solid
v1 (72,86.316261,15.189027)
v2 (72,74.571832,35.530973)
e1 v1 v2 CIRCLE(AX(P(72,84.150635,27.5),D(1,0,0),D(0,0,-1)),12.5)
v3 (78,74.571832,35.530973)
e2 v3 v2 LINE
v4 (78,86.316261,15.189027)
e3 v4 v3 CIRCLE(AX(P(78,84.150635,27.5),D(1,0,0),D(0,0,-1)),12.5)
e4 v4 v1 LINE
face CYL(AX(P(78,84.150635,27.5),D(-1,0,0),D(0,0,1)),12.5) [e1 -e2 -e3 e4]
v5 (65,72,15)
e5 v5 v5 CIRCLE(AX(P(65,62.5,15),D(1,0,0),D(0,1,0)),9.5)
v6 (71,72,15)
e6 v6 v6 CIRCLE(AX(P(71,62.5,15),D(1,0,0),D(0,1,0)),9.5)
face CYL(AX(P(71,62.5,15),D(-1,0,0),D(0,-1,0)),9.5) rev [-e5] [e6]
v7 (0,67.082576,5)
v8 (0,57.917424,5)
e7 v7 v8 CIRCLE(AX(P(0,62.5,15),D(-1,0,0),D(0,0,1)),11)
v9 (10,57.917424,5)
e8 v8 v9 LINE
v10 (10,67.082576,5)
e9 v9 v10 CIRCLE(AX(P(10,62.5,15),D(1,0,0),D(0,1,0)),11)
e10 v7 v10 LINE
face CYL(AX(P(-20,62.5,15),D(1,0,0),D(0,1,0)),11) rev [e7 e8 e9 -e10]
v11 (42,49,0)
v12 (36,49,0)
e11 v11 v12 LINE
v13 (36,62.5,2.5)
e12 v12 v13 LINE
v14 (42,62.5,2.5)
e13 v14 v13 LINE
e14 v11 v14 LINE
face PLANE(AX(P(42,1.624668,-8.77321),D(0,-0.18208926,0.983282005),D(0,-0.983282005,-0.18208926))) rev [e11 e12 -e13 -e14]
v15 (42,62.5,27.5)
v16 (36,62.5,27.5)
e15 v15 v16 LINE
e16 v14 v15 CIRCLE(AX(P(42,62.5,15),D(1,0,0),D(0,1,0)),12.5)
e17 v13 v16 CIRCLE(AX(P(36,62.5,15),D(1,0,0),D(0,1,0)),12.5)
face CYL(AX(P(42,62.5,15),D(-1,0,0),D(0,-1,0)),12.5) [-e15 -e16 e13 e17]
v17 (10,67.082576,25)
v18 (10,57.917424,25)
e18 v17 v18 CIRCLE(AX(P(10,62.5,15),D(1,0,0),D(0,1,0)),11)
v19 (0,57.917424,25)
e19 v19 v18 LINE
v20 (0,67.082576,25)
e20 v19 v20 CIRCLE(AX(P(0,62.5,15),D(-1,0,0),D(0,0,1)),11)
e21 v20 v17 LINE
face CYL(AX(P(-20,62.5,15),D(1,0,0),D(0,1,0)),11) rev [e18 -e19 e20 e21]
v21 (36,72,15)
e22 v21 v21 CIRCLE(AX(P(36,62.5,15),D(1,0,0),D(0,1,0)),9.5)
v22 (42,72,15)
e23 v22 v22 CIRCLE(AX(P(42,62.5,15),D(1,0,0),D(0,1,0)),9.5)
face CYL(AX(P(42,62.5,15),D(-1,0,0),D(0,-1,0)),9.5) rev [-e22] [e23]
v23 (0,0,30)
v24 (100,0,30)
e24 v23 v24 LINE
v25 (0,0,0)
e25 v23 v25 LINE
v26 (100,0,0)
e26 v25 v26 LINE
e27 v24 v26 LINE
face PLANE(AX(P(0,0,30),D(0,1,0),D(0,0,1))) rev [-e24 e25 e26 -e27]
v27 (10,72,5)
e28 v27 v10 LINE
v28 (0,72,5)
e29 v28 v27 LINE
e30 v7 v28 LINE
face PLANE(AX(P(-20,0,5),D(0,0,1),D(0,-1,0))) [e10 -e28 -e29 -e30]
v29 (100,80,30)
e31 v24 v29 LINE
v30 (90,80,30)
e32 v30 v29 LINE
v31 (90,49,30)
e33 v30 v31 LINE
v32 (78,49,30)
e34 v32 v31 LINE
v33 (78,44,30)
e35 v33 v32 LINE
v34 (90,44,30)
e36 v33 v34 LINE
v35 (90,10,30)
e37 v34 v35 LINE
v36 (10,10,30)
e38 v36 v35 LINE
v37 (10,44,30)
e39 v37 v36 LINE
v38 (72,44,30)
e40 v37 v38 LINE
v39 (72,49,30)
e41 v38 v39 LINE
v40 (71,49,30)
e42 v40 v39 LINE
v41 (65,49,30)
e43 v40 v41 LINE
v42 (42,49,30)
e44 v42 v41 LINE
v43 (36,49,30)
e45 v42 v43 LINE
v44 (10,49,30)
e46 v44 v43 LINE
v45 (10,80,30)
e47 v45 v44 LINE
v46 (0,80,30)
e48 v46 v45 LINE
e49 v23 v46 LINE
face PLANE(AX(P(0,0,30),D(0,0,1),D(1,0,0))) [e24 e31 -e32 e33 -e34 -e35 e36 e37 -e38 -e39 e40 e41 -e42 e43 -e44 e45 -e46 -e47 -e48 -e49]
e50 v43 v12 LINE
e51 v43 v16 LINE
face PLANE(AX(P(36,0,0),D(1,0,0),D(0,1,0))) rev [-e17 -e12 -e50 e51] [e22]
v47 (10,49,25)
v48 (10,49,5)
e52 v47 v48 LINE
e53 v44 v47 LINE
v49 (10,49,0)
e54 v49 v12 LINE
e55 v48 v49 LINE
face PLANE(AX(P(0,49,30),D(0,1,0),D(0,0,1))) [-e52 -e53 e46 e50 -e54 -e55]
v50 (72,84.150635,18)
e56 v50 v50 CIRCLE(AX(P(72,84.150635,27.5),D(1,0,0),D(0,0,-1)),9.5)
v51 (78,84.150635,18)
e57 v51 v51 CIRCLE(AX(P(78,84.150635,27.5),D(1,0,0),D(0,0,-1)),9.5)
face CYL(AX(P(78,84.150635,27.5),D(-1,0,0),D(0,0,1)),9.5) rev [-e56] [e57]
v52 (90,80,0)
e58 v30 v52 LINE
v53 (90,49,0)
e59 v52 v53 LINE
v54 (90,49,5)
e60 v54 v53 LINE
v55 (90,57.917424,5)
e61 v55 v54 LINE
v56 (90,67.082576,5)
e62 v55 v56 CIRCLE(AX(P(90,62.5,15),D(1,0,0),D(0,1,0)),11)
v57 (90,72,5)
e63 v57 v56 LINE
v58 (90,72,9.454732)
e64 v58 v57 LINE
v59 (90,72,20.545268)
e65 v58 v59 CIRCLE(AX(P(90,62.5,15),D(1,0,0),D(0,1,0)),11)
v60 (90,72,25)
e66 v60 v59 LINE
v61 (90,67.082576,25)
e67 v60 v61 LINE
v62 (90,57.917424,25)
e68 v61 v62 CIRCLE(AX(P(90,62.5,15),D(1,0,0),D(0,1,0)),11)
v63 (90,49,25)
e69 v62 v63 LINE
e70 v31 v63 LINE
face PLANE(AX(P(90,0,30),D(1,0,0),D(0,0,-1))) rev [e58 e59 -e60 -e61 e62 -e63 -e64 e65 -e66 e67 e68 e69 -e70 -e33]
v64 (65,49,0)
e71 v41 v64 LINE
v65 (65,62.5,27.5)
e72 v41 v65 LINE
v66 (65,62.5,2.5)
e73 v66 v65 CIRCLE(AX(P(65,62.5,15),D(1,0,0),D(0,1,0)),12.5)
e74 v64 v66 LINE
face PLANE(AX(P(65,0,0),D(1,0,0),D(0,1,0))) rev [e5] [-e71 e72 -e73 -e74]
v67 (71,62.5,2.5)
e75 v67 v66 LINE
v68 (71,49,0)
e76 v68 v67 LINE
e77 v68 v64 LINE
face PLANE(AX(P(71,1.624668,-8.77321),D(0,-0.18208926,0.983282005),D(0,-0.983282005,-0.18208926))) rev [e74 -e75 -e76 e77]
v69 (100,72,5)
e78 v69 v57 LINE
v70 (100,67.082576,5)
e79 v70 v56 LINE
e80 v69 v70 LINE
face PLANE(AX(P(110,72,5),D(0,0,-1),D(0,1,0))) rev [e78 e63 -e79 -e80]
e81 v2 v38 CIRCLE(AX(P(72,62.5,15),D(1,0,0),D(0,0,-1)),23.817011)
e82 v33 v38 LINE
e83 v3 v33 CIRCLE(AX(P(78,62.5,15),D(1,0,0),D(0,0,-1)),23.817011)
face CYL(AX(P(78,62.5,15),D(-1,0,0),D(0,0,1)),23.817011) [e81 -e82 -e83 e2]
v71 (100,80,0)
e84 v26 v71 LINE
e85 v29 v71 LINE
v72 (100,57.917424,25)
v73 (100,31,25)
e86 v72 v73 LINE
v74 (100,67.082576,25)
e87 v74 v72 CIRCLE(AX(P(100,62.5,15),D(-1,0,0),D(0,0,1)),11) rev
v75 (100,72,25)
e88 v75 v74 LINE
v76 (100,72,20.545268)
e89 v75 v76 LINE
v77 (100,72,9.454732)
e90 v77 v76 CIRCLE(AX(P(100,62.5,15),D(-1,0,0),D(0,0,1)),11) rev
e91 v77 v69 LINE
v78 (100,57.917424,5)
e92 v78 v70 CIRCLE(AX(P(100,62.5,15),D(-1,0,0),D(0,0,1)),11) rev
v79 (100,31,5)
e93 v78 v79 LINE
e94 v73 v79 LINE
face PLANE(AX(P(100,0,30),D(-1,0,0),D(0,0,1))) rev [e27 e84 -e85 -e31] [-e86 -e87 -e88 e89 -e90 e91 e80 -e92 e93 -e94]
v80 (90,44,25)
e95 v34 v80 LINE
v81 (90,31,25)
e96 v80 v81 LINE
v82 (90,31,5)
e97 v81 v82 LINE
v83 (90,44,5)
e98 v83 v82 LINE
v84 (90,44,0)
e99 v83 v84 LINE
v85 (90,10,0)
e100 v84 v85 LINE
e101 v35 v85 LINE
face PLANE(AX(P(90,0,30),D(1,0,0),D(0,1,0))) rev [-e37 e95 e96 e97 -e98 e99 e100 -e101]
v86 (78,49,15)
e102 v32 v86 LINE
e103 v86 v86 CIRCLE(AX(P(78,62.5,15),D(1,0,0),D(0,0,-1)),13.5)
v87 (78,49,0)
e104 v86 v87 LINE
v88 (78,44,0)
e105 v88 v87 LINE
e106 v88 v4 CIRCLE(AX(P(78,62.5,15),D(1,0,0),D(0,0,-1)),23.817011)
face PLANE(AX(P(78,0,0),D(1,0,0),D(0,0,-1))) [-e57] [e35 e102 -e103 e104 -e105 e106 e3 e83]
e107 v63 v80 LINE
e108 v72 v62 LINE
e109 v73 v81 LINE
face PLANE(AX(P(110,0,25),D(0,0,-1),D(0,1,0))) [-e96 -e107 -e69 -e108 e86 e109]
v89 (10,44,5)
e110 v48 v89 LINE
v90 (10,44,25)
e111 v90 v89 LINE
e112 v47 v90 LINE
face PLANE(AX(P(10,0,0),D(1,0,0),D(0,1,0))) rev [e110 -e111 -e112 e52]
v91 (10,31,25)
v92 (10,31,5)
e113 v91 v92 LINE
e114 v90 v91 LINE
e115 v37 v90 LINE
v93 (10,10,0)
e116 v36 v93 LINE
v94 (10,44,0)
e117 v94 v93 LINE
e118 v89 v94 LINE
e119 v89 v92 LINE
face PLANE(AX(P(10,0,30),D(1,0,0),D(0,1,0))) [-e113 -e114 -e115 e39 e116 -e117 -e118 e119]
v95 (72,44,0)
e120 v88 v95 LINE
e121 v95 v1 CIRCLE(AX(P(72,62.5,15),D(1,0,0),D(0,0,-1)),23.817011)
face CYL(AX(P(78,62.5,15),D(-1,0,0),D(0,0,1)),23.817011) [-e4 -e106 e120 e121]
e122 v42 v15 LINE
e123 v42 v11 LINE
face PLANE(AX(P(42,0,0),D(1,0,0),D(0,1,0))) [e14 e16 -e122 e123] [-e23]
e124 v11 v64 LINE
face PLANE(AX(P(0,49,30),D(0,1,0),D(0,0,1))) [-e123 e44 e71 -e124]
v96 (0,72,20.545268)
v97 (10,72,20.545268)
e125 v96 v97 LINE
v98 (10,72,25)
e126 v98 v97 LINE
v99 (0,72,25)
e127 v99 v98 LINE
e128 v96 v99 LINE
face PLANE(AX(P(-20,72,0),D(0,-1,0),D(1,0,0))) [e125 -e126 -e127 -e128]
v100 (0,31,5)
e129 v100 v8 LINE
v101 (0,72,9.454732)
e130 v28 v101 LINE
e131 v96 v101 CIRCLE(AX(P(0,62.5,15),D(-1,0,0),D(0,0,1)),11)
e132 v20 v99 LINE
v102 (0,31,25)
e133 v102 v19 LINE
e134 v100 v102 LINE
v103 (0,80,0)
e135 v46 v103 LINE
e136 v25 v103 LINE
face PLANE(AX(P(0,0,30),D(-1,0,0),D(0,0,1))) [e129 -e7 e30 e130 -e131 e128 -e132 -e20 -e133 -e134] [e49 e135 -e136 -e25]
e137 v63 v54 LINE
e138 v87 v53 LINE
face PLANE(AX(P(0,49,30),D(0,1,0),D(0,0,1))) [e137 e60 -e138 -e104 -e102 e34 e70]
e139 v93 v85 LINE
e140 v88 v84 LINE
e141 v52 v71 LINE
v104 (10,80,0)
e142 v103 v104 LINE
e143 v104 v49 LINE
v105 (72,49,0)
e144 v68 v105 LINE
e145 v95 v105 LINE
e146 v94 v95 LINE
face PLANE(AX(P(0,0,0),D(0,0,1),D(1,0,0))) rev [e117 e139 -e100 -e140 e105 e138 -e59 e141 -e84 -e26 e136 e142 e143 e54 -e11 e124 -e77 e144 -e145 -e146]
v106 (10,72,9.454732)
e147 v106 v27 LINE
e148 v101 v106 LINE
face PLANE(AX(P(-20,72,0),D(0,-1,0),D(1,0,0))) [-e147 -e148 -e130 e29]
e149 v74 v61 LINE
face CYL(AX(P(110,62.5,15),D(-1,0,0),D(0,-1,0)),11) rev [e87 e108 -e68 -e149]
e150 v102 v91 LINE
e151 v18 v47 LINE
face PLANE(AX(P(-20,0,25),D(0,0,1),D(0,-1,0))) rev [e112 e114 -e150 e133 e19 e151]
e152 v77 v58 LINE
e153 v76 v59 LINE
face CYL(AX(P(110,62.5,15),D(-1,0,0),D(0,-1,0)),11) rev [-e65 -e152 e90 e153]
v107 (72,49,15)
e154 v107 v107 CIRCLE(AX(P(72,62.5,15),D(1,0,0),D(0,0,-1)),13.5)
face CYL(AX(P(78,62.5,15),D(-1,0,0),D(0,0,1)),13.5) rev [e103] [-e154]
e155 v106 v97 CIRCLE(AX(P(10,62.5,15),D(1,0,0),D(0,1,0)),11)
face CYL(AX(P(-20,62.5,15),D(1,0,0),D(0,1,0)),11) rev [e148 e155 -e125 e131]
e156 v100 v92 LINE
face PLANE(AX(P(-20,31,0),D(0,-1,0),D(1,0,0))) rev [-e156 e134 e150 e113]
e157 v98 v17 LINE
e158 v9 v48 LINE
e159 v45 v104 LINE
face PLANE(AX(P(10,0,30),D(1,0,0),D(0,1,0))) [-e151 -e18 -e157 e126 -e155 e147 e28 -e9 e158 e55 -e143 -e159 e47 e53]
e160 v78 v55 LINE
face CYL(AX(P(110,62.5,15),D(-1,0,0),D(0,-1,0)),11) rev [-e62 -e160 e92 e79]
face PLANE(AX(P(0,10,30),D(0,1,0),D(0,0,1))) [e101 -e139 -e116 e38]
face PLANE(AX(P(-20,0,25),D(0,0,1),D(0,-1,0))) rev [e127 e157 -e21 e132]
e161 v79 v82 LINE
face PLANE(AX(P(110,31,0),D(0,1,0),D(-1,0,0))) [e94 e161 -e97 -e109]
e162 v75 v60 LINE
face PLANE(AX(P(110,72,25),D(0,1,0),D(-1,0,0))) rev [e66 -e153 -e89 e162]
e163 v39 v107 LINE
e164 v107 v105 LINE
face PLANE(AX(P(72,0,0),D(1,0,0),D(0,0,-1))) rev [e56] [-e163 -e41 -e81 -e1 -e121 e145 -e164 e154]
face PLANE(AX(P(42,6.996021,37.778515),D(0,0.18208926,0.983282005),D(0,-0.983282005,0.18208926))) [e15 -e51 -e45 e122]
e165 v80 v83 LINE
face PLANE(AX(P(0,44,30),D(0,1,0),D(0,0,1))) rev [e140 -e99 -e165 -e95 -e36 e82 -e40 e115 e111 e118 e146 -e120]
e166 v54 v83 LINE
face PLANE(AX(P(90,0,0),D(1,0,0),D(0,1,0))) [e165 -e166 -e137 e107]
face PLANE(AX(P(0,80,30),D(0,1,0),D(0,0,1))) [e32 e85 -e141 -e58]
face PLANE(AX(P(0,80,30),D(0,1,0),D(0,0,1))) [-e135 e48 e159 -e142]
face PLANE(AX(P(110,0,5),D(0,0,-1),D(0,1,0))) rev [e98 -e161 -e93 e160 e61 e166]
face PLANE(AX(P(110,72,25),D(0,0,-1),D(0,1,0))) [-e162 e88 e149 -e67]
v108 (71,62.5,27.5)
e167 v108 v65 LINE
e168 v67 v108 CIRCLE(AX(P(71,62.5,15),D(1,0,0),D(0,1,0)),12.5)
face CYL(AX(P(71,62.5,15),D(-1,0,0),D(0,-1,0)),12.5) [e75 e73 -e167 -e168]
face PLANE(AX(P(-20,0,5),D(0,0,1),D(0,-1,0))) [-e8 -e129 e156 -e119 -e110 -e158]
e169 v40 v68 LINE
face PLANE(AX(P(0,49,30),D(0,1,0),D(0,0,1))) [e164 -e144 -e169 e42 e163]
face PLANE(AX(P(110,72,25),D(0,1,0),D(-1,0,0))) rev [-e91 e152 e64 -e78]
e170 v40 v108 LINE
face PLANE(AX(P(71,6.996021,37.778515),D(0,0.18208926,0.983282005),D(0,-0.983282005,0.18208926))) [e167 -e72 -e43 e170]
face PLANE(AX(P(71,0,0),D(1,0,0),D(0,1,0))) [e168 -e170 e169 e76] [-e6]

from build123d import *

# Parameters (mm, degrees)
CROQUIS1_W              = 80
CROQUIS1_H              = 34
SALIENTE_EXTRUIR1_DEPTH = 30
CROQUIS2_W              = 20
CROQUIS2_H              = 18
CORTAR_EXTRUIR1_DEPTH   = 30
CORTAR_EXTRUIR2_START   = 100
CROQUIS2_4_R            = 11
CROQUIS2_4_W            = 20
CROQUIS2_4_H            = 41
CORTAR_EXTRUIR2_DEPTH   = 20
SALIENTE_EXTRUIR2_START = 32
SALIENTE_EXTRUIR2_DEPTH = 6
SALIENTE_EXTRUIR3_START = 61
SALIENTE_EXTRUIR3_DEPTH = 6
SALIENTE_EXTRUIR4_START = -28
SALIENTE_EXTRUIR4_DEPTH = 6


# Read off the part's stored shape, not the designer's step: Saliente-Extruir4
with BuildPart() as part:
    # Croquis1 → Saliente-Extruir1 (new body)
    with BuildSketch(Plane.XY):
        Polygon((0, 80), (0, 0), (100, 0), (100, 80), (90, 80), (90, 49), (10, 49), (10, 80), align=None)
        with Locations((50, 27)):
            Rectangle(CROQUIS1_W, CROQUIS1_H, mode=Mode.SUBTRACT)
    extrude(amount=SALIENTE_EXTRUIR1_DEPTH)

    # Croquis2 → Cortar-Extruir1 (cut)
    with BuildSketch(Plane(origin=(10, 0, 0), x_dir=(0, 0, -1), z_dir=(1, 0, 0))):
        with BuildLine():
            Line((-20.545268253, 72), (-25, 72))
            Line((-25, 72), (-25, 67.082575695))
            ThreePointArc((-25, 67.082575695), (-23.152245501, 69.885180654), (-20.545268253, 72))
        make_face()
        with BuildLine():
            ThreePointArc((-9.454731747, 72), (-15, 73.5), (-20.545268253, 72))
            Line((-20.545268253, 72), (-9.454731747, 72))
        make_face()
        with BuildLine():
            Line((-5, 72), (-9.454731747, 72))
            ThreePointArc((-9.454731747, 72), (-6.847754499, 69.885180654), (-5, 67.082575695))
            Line((-5, 67.082575695), (-5, 72))
        make_face()
        with BuildLine():
            ThreePointArc((-4, 62.5), (-4.25290737, 64.84520788), (-5, 67.082575695))
            Line((-5, 67.082575695), (-5, 62.5))
            Line((-5, 62.5), (-4, 62.5))
        make_face()
        with BuildLine():
            Line((-4, 62.5), (-5, 62.5))
            Line((-5, 62.5), (-5, 57.917424305))
            ThreePointArc((-5, 57.917424305), (-4.25290737, 60.15479212), (-4, 62.5))
        make_face()
        with BuildLine():
            Line((-25, 62.5), (-25, 67.082575695))
            ThreePointArc((-25, 67.082575695), (-25.74709263, 64.84520788), (-26, 62.5))
            Line((-26, 62.5), (-25, 62.5))
        make_face()
        with BuildLine():
            Line((-25, 57.917424305), (-25, 62.5))
            Line((-25, 62.5), (-26, 62.5))
            ThreePointArc((-26, 62.5), (-25.74709263, 60.15479212), (-25, 57.917424305))
        make_face()
        with BuildLine():
            Line((-9.454731747, 72), (-20.545268253, 72))
            ThreePointArc((-20.545268253, 72), (-23.152245501, 69.885180654), (-25, 67.082575695))
            Line((-25, 67.082575695), (-25, 62.5))
            Line((-25, 62.5), (-5, 62.5))
            Line((-5, 62.5), (-5, 67.082575695))
            ThreePointArc((-5, 67.082575695), (-6.847754499, 69.885180654), (-9.454731747, 72))
        make_face()
        with BuildLine():
            Line((-5, 62.5), (-25, 62.5))
            Line((-25, 62.5), (-25, 57.917424305))
            ThreePointArc((-25, 57.917424305), (-15, 51.5), (-5, 57.917424305))
            Line((-5, 57.917424305), (-5, 62.5))
        make_face()
        with BuildLine():
            ThreePointArc((-5, 57.917424305), (-15, 51.5), (-25, 57.917424305))
            Line((-25, 57.917424305), (-25, 49))
            Line((-25, 49), (-5, 49))
            Line((-5, 49), (-5, 57.917424305))
        make_face()
        with Locations((-15, 40)):
            Rectangle(CROQUIS2_W, CROQUIS2_H)
    extrude(amount=-CORTAR_EXTRUIR1_DEPTH, mode=Mode.SUBTRACT)

    # Croquis2<4> → Cortar-Extruir2 (cut)
    with BuildSketch(Plane(origin=(10, 0, 0), x_dir=(0, 0, -1), z_dir=(1, 0, 0)).offset(CORTAR_EXTRUIR2_START)):
        with Locations((-15, 62.5)):
            Circle(CROQUIS2_4_R)
        with Locations((-15, 51.5)):
            Rectangle(CROQUIS2_4_W, CROQUIS2_4_H)
    extrude(amount=-CORTAR_EXTRUIR2_DEPTH, mode=Mode.SUBTRACT)

    # Croquis3 → Saliente-Extruir2 (add)
    with BuildSketch(Plane(origin=(10, 0, 0), x_dir=(0, 0, -1), z_dir=(1, 0, 0)).offset(SALIENTE_EXTRUIR2_START)):
        with BuildLine():
            Line((-15, 49), (-15, 50))
            ThreePointArc((-15, 50), (-20.590169944, 51.319660113), (-25, 55))
            Line((-25, 55), (-25, 49))
            Line((-25, 49), (-15, 49))
        make_face()
        with BuildLine():
            ThreePointArc((-5, 55), (-9.409830056, 51.319660113), (-15, 50))
            Line((-15, 50), (-15, 49))
            Line((-15, 49), (-5, 49))
            Line((-5, 49), (-5, 55))
        make_face()
        with BuildLine():
            Line((0, 49), (-2.5, 62.5))
            ThreePointArc((-2.5, 62.5), (-3.141458774, 58.547152925), (-5, 55))
            Line((-5, 55), (-5, 49))
            Line((-5, 49), (0, 49))
        make_face()
        with BuildLine():
            ThreePointArc((-25, 55), (-26.858541226, 58.547152925), (-27.5, 62.5))
            Line((-27.5, 62.5), (-30, 49))
            Line((-30, 49), (-25, 49))
            Line((-25, 49), (-25, 55))
        make_face()
        with BuildLine():
            Line((-15, 72), (-15, 73.5))
            ThreePointArc((-15, 73.5), (-17.872281323, 73.118380291), (-20.545268253, 72))
            Line((-20.545268253, 72), (-23.124038405, 72))
            ThreePointArc((-23.124038405, 72), (-24.117027587, 71.051596809), (-25, 70))
            Line((-25, 70), (-25, 67.082575695))
            ThreePointArc((-25, 67.082575695), (-26, 62.5), (-25, 57.917424305))
            Line((-25, 57.917424305), (-25, 55))
            ThreePointArc((-25, 55), (-20.590169944, 51.319660113), (-15, 50))
            Line((-15, 50), (-15, 53))
            ThreePointArc((-15, 53), (-24.5, 62.5), (-15, 72))
        make_face()
        with BuildLine():
            Line((-25, 67.082575695), (-25, 70))
            ThreePointArc((-25, 70), (-26.858541226, 66.452847075), (-27.5, 62.5))
            ThreePointArc((-27.5, 62.5), (-26.858541226, 58.547152925), (-25, 55))
            Line((-25, 55), (-25, 57.917424305))
            ThreePointArc((-25, 57.917424305), (-26, 62.5), (-25, 67.082575695))
        make_face()
        with BuildLine():
            ThreePointArc((-9.454731747, 72), (-12.127718677, 73.118380291), (-15, 73.5))
            Line((-15, 73.5), (-15, 72))
            ThreePointArc((-15, 72), (-8.282485579, 69.217514421), (-5.5, 62.5))
            ThreePointArc((-5.5, 62.5), (-8.282485579, 55.782485579), (-15, 53))
            Line((-15, 53), (-15, 50))
            ThreePointArc((-15, 50), (-9.409830056, 51.319660113), (-5, 55))
            Line((-5, 55), (-5, 57.917424305))
            ThreePointArc((-5, 57.917424305), (-4, 62.5), (-5, 67.082575695))
            Line((-5, 67.082575695), (-5, 70))
            ThreePointArc((-5, 70), (-5.882972413, 71.051596809), (-6.875961595, 72))
            Line((-6.875961595, 72), (-9.454731747, 72))
        make_face()
        with BuildLine():
            ThreePointArc((-2.5, 62.5), (-3.141458774, 66.452847075), (-5, 70))
            Line((-5, 70), (-5, 67.082575695))
            ThreePointArc((-5, 67.082575695), (-4, 62.5), (-5, 57.917424305))
            Line((-5, 57.917424305), (-5, 55))
            ThreePointArc((-5, 55), (-3.141458774, 58.547152925), (-2.5, 62.5))
        make_face()
        with BuildLine():
            ThreePointArc((-6.875961595, 72), (-10.669872981, 74.2260394), (-15, 75))
            Line((-15, 75), (-15, 73.5))
            ThreePointArc((-15, 73.5), (-12.127718677, 73.118380291), (-9.454731747, 72))
            Line((-9.454731747, 72), (-6.875961595, 72))
        make_face()
        with BuildLine():
            Line((-15, 73.5), (-15, 75))
            ThreePointArc((-15, 75), (-19.330127019, 74.2260394), (-23.124038405, 72))
            Line((-23.124038405, 72), (-20.545268253, 72))
            ThreePointArc((-20.545268253, 72), (-17.872281323, 73.118380291), (-15, 73.5))
        make_face()
    extrude(amount=-SALIENTE_EXTRUIR2_DEPTH)

    # Croquis3<3> → Saliente-Extruir3 (add)
    with BuildSketch(Plane(origin=(10, 0, 0), x_dir=(0, 0, -1), z_dir=(1, 0, 0)).offset(SALIENTE_EXTRUIR3_START)):
        with BuildLine():
            Line((0, 49), (-2.5, 62.5))
            ThreePointArc((-2.5, 62.5), (-3.141458774, 58.547152925), (-5, 55))
            Line((-5, 55), (-5, 49))
            Line((-5, 49), (0, 49))
        make_face()
        with BuildLine():
            ThreePointArc((-5, 55), (-9.409830056, 51.319660113), (-15, 50))
            Line((-15, 50), (-15, 49))
            Line((-15, 49), (-5, 49))
            Line((-5, 49), (-5, 55))
        make_face()
        with BuildLine():
            ThreePointArc((-2.5, 62.5), (-3.141458774, 66.452847075), (-5, 70))
            Line((-5, 70), (-5, 67.082575695))
            ThreePointArc((-5, 67.082575695), (-4, 62.5), (-5, 57.917424305))
            Line((-5, 57.917424305), (-5, 55))
            ThreePointArc((-5, 55), (-3.141458774, 58.547152925), (-2.5, 62.5))
        make_face()
        with BuildLine():
            ThreePointArc((-9.454731747, 72), (-12.127718677, 73.118380291), (-15, 73.5))
            Line((-15, 73.5), (-15, 72))
            ThreePointArc((-15, 72), (-8.282485579, 69.217514421), (-5.5, 62.5))
            ThreePointArc((-5.5, 62.5), (-8.282485579, 55.782485579), (-15, 53))
            Line((-15, 53), (-15, 50))
            ThreePointArc((-15, 50), (-9.409830056, 51.319660113), (-5, 55))
            Line((-5, 55), (-5, 57.917424305))
            ThreePointArc((-5, 57.917424305), (-4, 62.5), (-5, 67.082575695))
            Line((-5, 67.082575695), (-5, 70))
            ThreePointArc((-5, 70), (-5.882972413, 71.051596809), (-6.875961595, 72))
            Line((-6.875961595, 72), (-9.454731747, 72))
        make_face()
        with BuildLine():
            Line((-15, 72), (-15, 73.5))
            ThreePointArc((-15, 73.5), (-17.872281323, 73.118380291), (-20.545268253, 72))
            Line((-20.545268253, 72), (-23.124038405, 72))
            ThreePointArc((-23.124038405, 72), (-24.117027587, 71.051596809), (-25, 70))
            Line((-25, 70), (-25, 67.082575695))
            ThreePointArc((-25, 67.082575695), (-26, 62.5), (-25, 57.917424305))
            Line((-25, 57.917424305), (-25, 55))
            ThreePointArc((-25, 55), (-20.590169944, 51.319660113), (-15, 50))
            Line((-15, 50), (-15, 53))
            ThreePointArc((-15, 53), (-24.5, 62.5), (-15, 72))
        make_face()
        with BuildLine():
            Line((-15, 49), (-15, 50))
            ThreePointArc((-15, 50), (-20.590169944, 51.319660113), (-25, 55))
            Line((-25, 55), (-25, 49))
            Line((-25, 49), (-15, 49))
        make_face()
        with BuildLine():
            ThreePointArc((-25, 55), (-26.858541226, 58.547152925), (-27.5, 62.5))
            Line((-27.5, 62.5), (-30, 49))
            Line((-30, 49), (-25, 49))
            Line((-25, 49), (-25, 55))
        make_face()
        with BuildLine():
            Line((-25, 67.082575695), (-25, 70))
            ThreePointArc((-25, 70), (-26.858541226, 66.452847075), (-27.5, 62.5))
            ThreePointArc((-27.5, 62.5), (-26.858541226, 58.547152925), (-25, 55))
            Line((-25, 55), (-25, 57.917424305))
            ThreePointArc((-25, 57.917424305), (-26, 62.5), (-25, 67.082575695))
        make_face()
        with BuildLine():
            Line((-15, 73.5), (-15, 75))
            ThreePointArc((-15, 75), (-19.330127019, 74.2260394), (-23.124038405, 72))
            Line((-23.124038405, 72), (-20.545268253, 72))
            ThreePointArc((-20.545268253, 72), (-17.872281323, 73.118380291), (-15, 73.5))
        make_face()
        with BuildLine():
            ThreePointArc((-6.875961595, 72), (-10.669872981, 74.2260394), (-15, 75))
            Line((-15, 75), (-15, 73.5))
            ThreePointArc((-15, 73.5), (-12.127718677, 73.118380291), (-9.454731747, 72))
            Line((-9.454731747, 72), (-6.875961595, 72))
        make_face()
    extrude(amount=-SALIENTE_EXTRUIR3_DEPTH)

    # Saliente-Extruir4 outline → Saliente-Extruir4 (add)
    with BuildSketch(Plane(origin=(100, 0, 0), x_dir=(0, 0, -1), z_dir=(1, 0, 0)).offset(SALIENTE_EXTRUIR4_START)):
        with BuildLine():
            Line((0, 49), (0, 44))
            ThreePointArc((0, 44), (6.500060011, 52.253175148), (8.817010728, 62.5))
            ThreePointArc((8.817010728, 62.5), (1.774205668, 79.407868707), (-15.189026595, 86.3162606))
            ThreePointArc((-15.189026595, 86.3162606), (-15.047346316, 85.237564817), (-15, 84.150635095))
            ThreePointArc((-15, 84.150635095), (-15.886469538, 79.527226156), (-18.420145635, 75.559579007))
            ThreePointArc((-18.420145635, 75.559579007), (-6.751423337, 73.186953871), (-1.5, 62.5))
            ThreePointArc((-1.5, 62.5), (-5.454058454, 52.954058454), (-15, 49))
            Line((-15, 49), (0, 49))
        make_face()
        with BuildLine():
            ThreePointArc((-35.530973405, 74.571832133), (-38.436547266, 58.259923086), (-30, 44))
            Line((-30, 44), (-30, 49))
            Line((-30, 49), (-30, 71.903186381))
            ThreePointArc((-30, 71.903186381), (-32.931921184, 72.892561003), (-35.530973405, 74.571832133))
        make_face()
        with BuildLine():
            ThreePointArc((-33.837691475, 77.073653622), (-34.724039173, 75.849617174), (-35.530973405, 74.571832133))
            ThreePointArc((-35.530973405, 74.571832133), (-32.931921184, 72.892561003), (-30, 71.903186381))
            Line((-30, 71.903186381), (-30, 74.985483705))
            ThreePointArc((-30, 74.985483705), (-32.040518809, 75.805954816), (-33.837691475, 77.073653622))
        make_face()
        with BuildLine():
            ThreePointArc((-15.189026595, 86.3162606), (-33.75, 94.975952642), (-35.530973405, 74.571832133))
            ThreePointArc((-35.530973405, 74.571832133), (-34.724039173, 75.849617174), (-33.837691475, 77.073653622))
            ThreePointArc((-33.837691475, 77.073653622), (-32.25, 92.377876431), (-18.202308525, 86.100746177))
            ThreePointArc((-18.202308525, 86.100746177), (-16.699088017, 86.256327576), (-15.189026595, 86.3162606))
        make_face()
        with BuildLine():
            Line((-30, 71.903186381), (-30, 49))
            Line((-30, 49), (-15, 49))
            ThreePointArc((-15, 49), (-27.457693483, 57.298473967), (-24.599854366, 71.991722508))
            ThreePointArc((-24.599854366, 71.991722508), (-27.295088327, 71.652314759), (-30, 71.903186381))
        make_face()
        with BuildLine():
            ThreePointArc((-15, 84.150635095), (-15.047346316, 85.237564817), (-15.189026595, 86.3162606))
            ThreePointArc((-15.189026595, 86.3162606), (-16.699088017, 86.256327576), (-18.202308525, 86.100746177))
            ThreePointArc((-18.202308525, 86.100746177), (-18.050712487, 85.130923569), (-18, 84.150635095))
            ThreePointArc((-18, 84.150635095), (-21.733718703, 76.600800659), (-30, 74.985483705))
            Line((-30, 74.985483705), (-30, 71.903186381))
            ThreePointArc((-30, 71.903186381), (-27.295088327, 71.652314759), (-24.599854366, 71.991722508))
            ThreePointArc((-24.599854366, 71.991722508), (-21.75, 74.191342951), (-18.420145635, 75.559579007))
            ThreePointArc((-18.420145635, 75.559579007), (-15.886469538, 79.527226156), (-15, 84.150635095))
        make_face()
    extrude(amount=SALIENTE_EXTRUIR4_DEPTH)


solid = part.part
